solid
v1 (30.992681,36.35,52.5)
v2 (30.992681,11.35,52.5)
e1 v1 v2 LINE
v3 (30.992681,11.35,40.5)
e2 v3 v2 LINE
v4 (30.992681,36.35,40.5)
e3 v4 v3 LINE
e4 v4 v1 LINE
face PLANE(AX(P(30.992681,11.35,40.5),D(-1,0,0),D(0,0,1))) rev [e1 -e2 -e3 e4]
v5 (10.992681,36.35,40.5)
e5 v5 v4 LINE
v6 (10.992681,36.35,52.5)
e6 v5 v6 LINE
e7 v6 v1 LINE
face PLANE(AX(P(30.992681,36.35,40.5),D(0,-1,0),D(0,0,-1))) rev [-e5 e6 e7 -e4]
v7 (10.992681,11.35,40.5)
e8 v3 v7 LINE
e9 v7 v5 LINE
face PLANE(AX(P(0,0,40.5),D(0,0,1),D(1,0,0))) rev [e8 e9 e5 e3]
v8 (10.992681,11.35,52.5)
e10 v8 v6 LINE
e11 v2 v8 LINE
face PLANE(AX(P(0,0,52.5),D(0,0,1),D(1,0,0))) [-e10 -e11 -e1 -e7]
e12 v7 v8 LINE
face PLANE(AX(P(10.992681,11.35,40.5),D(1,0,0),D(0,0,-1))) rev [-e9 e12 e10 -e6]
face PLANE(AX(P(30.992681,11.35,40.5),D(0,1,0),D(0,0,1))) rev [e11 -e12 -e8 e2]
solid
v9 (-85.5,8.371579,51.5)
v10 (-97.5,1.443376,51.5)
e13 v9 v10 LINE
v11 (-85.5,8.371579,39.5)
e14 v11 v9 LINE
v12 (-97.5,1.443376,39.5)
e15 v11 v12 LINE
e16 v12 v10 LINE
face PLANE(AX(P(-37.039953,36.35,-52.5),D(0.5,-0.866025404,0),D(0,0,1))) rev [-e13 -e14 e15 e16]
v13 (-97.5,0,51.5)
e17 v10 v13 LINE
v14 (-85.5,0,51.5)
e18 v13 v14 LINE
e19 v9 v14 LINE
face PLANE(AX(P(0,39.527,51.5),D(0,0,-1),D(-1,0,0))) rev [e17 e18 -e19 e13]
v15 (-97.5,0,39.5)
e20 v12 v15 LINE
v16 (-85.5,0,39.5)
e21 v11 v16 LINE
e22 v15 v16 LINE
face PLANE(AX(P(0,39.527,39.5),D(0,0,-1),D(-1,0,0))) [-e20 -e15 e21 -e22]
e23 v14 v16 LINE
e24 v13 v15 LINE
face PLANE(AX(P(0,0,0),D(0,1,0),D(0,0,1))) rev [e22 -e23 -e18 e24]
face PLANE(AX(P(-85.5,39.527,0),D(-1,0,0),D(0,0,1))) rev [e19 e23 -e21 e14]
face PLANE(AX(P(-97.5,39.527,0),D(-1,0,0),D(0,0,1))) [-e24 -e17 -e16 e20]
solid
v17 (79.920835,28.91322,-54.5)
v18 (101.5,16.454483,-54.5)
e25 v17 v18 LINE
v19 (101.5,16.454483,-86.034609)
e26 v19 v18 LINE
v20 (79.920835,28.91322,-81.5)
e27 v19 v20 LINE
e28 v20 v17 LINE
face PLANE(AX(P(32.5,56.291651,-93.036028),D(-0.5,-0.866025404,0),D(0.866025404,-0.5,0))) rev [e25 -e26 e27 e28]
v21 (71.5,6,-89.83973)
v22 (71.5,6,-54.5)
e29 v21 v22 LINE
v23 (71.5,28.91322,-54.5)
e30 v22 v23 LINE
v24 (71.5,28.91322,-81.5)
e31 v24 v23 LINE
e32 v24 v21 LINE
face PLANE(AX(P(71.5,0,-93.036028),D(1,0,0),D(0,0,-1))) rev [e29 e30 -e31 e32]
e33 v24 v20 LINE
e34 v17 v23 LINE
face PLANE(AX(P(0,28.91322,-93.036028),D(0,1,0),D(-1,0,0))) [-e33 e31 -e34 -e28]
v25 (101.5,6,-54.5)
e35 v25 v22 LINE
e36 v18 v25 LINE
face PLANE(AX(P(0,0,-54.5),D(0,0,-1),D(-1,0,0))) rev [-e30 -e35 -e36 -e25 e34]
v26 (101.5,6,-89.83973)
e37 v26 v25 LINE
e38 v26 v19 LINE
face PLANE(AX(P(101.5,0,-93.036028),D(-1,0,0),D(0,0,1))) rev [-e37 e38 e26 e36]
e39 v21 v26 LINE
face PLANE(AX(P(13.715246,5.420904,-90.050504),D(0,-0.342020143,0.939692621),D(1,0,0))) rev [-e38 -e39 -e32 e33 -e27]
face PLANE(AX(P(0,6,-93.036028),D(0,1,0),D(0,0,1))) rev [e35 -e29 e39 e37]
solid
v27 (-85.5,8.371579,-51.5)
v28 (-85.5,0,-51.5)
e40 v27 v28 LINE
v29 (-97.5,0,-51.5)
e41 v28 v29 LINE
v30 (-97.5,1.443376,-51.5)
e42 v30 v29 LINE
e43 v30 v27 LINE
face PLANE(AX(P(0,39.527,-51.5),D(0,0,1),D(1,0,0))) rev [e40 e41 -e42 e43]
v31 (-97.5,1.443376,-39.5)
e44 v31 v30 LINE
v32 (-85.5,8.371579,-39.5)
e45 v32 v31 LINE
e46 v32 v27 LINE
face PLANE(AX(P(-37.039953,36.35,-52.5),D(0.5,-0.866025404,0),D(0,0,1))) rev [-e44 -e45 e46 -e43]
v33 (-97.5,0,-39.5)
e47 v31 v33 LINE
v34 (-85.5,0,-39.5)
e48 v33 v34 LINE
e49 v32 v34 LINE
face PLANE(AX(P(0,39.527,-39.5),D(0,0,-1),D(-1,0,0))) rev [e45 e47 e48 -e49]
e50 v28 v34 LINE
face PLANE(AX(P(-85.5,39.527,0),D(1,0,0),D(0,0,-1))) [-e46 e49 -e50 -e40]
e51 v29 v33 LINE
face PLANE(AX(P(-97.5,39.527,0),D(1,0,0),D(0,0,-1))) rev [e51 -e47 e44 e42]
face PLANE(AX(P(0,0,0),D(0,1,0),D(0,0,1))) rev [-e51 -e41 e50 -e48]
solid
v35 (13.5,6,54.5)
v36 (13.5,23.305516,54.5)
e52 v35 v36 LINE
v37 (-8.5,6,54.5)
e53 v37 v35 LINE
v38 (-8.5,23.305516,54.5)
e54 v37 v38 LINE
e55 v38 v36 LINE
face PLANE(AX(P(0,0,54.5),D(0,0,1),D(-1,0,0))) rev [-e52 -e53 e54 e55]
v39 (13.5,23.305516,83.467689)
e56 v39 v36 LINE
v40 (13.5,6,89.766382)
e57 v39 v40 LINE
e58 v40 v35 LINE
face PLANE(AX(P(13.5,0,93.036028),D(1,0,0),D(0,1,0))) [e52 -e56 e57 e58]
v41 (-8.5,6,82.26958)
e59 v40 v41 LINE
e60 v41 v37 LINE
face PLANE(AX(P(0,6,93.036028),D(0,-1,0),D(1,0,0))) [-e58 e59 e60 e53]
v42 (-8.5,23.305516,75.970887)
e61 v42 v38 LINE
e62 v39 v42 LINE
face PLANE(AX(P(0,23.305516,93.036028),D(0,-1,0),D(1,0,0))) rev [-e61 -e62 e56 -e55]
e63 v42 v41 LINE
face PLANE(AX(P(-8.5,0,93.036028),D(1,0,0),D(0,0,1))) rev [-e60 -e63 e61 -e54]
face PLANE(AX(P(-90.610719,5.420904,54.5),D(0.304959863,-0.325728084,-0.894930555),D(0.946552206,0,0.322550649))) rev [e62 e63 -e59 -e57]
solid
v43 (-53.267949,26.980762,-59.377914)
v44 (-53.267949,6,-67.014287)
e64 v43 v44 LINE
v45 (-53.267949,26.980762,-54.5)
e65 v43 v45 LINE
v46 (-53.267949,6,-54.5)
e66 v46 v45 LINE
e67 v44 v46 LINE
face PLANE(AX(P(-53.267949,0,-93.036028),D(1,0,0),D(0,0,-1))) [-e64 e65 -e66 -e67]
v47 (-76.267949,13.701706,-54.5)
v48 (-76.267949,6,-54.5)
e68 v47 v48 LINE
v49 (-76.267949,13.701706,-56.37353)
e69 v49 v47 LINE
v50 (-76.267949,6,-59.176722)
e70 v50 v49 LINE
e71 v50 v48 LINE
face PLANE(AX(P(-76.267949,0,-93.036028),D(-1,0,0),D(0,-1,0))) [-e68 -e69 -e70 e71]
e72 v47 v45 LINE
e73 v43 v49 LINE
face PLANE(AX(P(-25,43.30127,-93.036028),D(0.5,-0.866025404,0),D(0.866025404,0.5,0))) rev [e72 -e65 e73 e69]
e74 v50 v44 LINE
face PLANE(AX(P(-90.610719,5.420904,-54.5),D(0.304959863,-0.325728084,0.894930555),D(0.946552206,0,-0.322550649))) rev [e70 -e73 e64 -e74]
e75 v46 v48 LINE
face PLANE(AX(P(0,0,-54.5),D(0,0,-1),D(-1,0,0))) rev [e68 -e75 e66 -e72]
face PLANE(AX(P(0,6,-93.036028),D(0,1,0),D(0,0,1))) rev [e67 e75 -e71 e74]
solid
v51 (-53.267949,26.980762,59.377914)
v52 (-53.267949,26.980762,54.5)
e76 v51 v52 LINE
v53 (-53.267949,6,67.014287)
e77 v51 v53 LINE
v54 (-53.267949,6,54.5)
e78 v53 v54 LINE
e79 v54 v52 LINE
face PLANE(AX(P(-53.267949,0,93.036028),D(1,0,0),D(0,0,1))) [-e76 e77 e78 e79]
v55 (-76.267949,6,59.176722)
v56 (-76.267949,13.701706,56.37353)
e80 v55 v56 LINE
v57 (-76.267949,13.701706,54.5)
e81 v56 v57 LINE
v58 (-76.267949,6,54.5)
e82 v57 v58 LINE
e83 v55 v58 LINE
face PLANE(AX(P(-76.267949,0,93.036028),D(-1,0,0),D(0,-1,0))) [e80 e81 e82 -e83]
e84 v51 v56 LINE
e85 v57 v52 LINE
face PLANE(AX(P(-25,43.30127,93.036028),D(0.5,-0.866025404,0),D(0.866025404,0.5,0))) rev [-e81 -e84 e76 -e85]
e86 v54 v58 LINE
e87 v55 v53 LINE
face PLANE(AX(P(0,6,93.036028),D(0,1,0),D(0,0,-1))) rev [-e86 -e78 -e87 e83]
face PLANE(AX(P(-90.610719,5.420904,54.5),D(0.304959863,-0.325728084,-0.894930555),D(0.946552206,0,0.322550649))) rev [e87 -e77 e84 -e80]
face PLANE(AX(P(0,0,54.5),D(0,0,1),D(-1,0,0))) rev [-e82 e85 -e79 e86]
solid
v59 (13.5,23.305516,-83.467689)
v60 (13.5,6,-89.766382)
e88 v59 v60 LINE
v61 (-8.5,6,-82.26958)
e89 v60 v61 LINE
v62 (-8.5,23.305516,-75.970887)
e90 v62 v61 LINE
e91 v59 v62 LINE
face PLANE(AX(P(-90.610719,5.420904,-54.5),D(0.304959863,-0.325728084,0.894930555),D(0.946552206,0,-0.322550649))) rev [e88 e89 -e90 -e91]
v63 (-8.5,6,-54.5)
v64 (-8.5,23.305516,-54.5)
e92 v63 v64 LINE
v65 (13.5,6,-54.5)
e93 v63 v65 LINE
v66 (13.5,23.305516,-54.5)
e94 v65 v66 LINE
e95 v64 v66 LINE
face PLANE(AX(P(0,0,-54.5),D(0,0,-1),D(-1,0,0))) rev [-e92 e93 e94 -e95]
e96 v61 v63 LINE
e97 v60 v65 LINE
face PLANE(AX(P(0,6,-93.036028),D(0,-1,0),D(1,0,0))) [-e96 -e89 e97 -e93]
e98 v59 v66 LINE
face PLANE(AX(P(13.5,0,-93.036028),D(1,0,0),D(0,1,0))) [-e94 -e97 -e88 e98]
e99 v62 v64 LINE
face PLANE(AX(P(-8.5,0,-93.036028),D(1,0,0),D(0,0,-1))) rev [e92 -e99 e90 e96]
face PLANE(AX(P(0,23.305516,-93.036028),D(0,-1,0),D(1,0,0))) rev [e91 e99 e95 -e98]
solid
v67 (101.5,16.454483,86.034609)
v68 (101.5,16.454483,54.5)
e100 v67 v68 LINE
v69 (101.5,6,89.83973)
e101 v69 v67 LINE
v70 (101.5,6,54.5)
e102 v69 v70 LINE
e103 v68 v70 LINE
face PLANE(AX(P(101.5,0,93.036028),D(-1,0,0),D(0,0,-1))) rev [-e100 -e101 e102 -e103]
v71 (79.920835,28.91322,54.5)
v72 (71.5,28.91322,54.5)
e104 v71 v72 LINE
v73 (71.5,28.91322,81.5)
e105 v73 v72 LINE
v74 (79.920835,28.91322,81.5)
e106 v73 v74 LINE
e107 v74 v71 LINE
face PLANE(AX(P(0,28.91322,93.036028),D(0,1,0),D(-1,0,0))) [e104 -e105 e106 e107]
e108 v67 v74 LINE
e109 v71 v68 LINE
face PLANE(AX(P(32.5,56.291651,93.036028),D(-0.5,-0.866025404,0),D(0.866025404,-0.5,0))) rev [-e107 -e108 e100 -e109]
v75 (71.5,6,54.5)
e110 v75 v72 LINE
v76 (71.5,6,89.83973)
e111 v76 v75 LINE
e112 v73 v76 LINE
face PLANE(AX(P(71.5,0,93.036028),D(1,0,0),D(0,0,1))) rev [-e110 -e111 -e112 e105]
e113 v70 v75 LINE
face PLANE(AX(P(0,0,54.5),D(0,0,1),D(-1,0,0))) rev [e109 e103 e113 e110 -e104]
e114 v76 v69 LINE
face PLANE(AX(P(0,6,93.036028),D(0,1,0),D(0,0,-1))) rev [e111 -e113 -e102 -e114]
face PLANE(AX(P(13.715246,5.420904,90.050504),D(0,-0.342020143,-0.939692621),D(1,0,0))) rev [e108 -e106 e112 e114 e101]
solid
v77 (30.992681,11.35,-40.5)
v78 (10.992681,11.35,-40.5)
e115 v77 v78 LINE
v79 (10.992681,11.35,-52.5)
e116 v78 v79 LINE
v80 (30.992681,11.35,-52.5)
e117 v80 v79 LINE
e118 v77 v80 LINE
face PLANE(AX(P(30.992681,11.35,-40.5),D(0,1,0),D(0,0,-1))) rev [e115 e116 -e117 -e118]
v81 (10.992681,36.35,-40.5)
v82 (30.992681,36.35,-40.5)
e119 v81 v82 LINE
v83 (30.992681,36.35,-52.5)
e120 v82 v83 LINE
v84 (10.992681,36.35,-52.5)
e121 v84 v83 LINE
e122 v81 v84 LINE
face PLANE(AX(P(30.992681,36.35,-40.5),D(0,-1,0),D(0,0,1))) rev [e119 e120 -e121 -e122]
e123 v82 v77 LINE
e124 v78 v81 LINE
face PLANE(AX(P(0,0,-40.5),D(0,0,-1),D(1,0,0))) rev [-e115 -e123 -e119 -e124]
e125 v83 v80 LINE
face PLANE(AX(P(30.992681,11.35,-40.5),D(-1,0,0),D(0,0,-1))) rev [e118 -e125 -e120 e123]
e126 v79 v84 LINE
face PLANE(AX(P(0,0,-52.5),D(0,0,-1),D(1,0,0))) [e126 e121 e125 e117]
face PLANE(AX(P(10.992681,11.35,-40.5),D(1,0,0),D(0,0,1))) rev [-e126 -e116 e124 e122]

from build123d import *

# Parameters (mm, degrees)
BOSS_EXTRUDE8_DEPTH   = 27
BOSS_EXTRUDE8_START   = 71.5
BOSS_EXTRUDE8_2_DEPTH = 30
BOSS_EXTRUDE8_START_2 = 65
BOSS_EXTRUDE8_3_DEPTH = 12
BOSS_EXTRUDE9_REACH   = 140.598
SKETCH5_W             = 12
SKETCH5_H             = 12
SKETCH13_W            = 20
SKETCH13_H            = 25
BOSS_EXTRUDE10_DEPTH  = 12


with BuildPart() as part:
    # Boss-Extrude8: read off the stored shape, not the designer's step
    # Boss-Extrude8 outline → Boss-Extrude8 (new body)
    with BuildSketch(Plane(origin=(0, 0, -54.5), x_dir=(-1, 0, 0), z_dir=(0, 0, -1))):
        Polygon((-101.5, 16.454482672), (-101.5, 6), (-71.5, 6), (-71.5, 28.913219679), (-79.920834506, 28.913219679), align=None)
    extrude(amount=BOSS_EXTRUDE8_DEPTH)

    # Boss-Extrude8 2 outline → Boss-Extrude8 2 (add)
    with BuildSketch(Plane.YZ.offset(BOSS_EXTRUDE8_START)):
        Polygon((6, -89.839729934), (28.913219679, -81.5), (6, -81.5), align=None)
    extrude(amount=BOSS_EXTRUDE8_2_DEPTH)

    # Boss-Extrude8 3 outline → Boss-Extrude8 3 (cut)
    with BuildSketch(Plane(origin=(0, 0, 0), x_dir=(0.866025403784438, -0.500000000000001, 0), z_dir=(0.500000000000001, 0.866025403784438, 0)).offset(BOSS_EXTRUDE8_START_2)):
        Polygon((54.756863134, 54.5), (79.674337148, 54.5), (79.674337148, 86.034609427), (54.756863134, 81.5), align=None)
    extrude(amount=BOSS_EXTRUDE8_3_DEPTH, mode=Mode.SUBTRACT)


with BuildPart() as body_2:
    # Boss-Extrude8 4: loft between two sections, ruled curve by curve
    boss_extrude8_4_from = [
        Edge.make_line((-8.5, 6, -82.269580064), (-8.5, 23.305515956, -75.970887367)),
        Edge.make_line((-8.5, 6, -82.269580064), (-8.5, 6, -54.5)),
        Edge.make_line((-8.5, 23.305515956, -75.970887367), (-8.5, 23.305515956, -54.5)),
        Edge.make_line((-8.5, 23.305515956, -54.5), (-8.5, 6, -54.5)),
    ]
    boss_extrude8_4_to = [
        Edge.make_line((13.5, 6, -89.766381851), (13.5, 23.305515956, -83.467689154)),
        Edge.make_line((13.5, 6, -89.766381851), (13.5, 6, -54.5)),
        Edge.make_line((13.5, 23.305515956, -83.467689154), (13.5, 23.305515956, -54.5)),
        Edge.make_line((13.5, 23.305515956, -54.5), (13.5, 6, -54.5)),
    ]
    boss_extrude8_4 = Solid(Shell([*[Face.make_surface_from_curves(boss_extrude8_4_from[k], boss_extrude8_4_to[k]) for k in range(4)], Face(Wire(boss_extrude8_4_from)), Face(Wire(boss_extrude8_4_to))]))
    add(boss_extrude8_4)


with BuildPart() as body_3:
    # Boss-Extrude8 5: loft between two sections, ruled curve by curve
    boss_extrude8_5_from = [
        Edge.make_line((-53.267949192, 26.980762114, -59.377914368), (-53.267949192, 6, -67.01428727)),
        Edge.make_line((-53.267949192, 6, -67.01428727), (-53.267949192, 6, -54.5)),
        Edge.make_line((-53.267949192, 6, -54.5), (-53.267949192, 26.980762114, -54.5)),
        Edge.make_line((-53.267949192, 26.980762114, -59.377914368), (-53.267949192, 26.980762114, -54.5)),
    ]
    boss_extrude8_5_to = [
        Edge.make_line((-76.267949192, 13.701705922, -56.373530057), (-76.267949192, 6, -59.176721766)),
        Edge.make_line((-76.267949192, 6, -59.176721766), (-76.267949192, 6, -54.5)),
        Edge.make_line((-76.267949192, 6, -54.5), (-76.267949192, 13.701705922, -54.5)),
        Edge.make_line((-76.267949192, 13.701705922, -56.373530057), (-76.267949192, 13.701705922, -54.5)),
    ]
    boss_extrude8_5 = Solid(Shell([*[Face.make_surface_from_curves(boss_extrude8_5_from[k], boss_extrude8_5_to[k]) for k in range(4)], Face(Wire(boss_extrude8_5_from)), Face(Wire(boss_extrude8_5_to))]))
    add(boss_extrude8_5)


with BuildPart() as body_4:
    # Boss-Extrude9: up to this plane
    boss_extrude9_end = Plane(origin=(-37.039953145, 36.35, -52.5), z_dir=(0.4999999999999954, -0.8660254037844414, 0))
    # Sketch5 → Boss-Extrude9 (new, up to the surface)
    with BuildSketch(Plane(origin=(0, 0, 0), x_dir=(1, 0, 0), z_dir=(0, 1, 0)), mode=Mode.PRIVATE) as boss_extrude9_sk1:
        with Locations((-91.5, -45.5)):
            Rectangle(SKETCH5_W, SKETCH5_H)
    boss_extrude9_tool1 = split(extrude(boss_extrude9_sk1.sketch, amount=BOSS_EXTRUDE9_REACH, mode=Mode.PRIVATE), bisect_by=boss_extrude9_end, keep=Keep.BOTH, mode=Mode.PRIVATE)
    add(boss_extrude9_tool1.solids().sort_by_distance((-91.5, 0, 45.5))[0])
    # Sketch5 → Boss-Extrude9 (new, up to the surface)
    with BuildSketch(Plane(origin=(0, 0, 0), x_dir=(1, 0, 0), z_dir=(0, 1, 0)), mode=Mode.PRIVATE) as boss_extrude9_sk2:
        with Locations((-91.5, 45.5)):
            Rectangle(SKETCH5_W, SKETCH5_H)
    boss_extrude9_tool2 = split(extrude(boss_extrude9_sk2.sketch, amount=BOSS_EXTRUDE9_REACH, mode=Mode.PRIVATE), bisect_by=boss_extrude9_end, keep=Keep.BOTH, mode=Mode.PRIVATE)
    add(boss_extrude9_tool2.solids().sort_by_distance((-91.5, 0, -45.5))[0])


with BuildPart() as body_5:
    # Mirror3: mirrored copy
    add(body_2.part.mirror(Plane.XY))


with BuildPart() as body_6:
    # Mirror3 2: mirrored copy
    add(body_3.part.mirror(Plane.XY))


with BuildPart() as body_7:
    # Mirror3 3: mirrored copy
    add(part.part.mirror(Plane.XY))


with BuildPart() as body_8:
    # Sketch13 → Boss-Extrude10 (new body)
    with BuildSketch(Plane(origin=(0, 0, 52.5), x_dir=(-1, 0, 0), z_dir=(0, 0, -1))):
        with Locations((-20.992681083, 23.85)):
            Rectangle(SKETCH13_W, SKETCH13_H)
    extrude(amount=BOSS_EXTRUDE10_DEPTH)


with BuildPart() as body_9:
    # Mirror5: mirrored copy
    add(body_8.part.mirror(Plane.XY))


solid = Compound([part.part, body_2.part, body_3.part, body_4.part, body_5.part, body_6.part, body_7.part, body_8.part, body_9.part])
